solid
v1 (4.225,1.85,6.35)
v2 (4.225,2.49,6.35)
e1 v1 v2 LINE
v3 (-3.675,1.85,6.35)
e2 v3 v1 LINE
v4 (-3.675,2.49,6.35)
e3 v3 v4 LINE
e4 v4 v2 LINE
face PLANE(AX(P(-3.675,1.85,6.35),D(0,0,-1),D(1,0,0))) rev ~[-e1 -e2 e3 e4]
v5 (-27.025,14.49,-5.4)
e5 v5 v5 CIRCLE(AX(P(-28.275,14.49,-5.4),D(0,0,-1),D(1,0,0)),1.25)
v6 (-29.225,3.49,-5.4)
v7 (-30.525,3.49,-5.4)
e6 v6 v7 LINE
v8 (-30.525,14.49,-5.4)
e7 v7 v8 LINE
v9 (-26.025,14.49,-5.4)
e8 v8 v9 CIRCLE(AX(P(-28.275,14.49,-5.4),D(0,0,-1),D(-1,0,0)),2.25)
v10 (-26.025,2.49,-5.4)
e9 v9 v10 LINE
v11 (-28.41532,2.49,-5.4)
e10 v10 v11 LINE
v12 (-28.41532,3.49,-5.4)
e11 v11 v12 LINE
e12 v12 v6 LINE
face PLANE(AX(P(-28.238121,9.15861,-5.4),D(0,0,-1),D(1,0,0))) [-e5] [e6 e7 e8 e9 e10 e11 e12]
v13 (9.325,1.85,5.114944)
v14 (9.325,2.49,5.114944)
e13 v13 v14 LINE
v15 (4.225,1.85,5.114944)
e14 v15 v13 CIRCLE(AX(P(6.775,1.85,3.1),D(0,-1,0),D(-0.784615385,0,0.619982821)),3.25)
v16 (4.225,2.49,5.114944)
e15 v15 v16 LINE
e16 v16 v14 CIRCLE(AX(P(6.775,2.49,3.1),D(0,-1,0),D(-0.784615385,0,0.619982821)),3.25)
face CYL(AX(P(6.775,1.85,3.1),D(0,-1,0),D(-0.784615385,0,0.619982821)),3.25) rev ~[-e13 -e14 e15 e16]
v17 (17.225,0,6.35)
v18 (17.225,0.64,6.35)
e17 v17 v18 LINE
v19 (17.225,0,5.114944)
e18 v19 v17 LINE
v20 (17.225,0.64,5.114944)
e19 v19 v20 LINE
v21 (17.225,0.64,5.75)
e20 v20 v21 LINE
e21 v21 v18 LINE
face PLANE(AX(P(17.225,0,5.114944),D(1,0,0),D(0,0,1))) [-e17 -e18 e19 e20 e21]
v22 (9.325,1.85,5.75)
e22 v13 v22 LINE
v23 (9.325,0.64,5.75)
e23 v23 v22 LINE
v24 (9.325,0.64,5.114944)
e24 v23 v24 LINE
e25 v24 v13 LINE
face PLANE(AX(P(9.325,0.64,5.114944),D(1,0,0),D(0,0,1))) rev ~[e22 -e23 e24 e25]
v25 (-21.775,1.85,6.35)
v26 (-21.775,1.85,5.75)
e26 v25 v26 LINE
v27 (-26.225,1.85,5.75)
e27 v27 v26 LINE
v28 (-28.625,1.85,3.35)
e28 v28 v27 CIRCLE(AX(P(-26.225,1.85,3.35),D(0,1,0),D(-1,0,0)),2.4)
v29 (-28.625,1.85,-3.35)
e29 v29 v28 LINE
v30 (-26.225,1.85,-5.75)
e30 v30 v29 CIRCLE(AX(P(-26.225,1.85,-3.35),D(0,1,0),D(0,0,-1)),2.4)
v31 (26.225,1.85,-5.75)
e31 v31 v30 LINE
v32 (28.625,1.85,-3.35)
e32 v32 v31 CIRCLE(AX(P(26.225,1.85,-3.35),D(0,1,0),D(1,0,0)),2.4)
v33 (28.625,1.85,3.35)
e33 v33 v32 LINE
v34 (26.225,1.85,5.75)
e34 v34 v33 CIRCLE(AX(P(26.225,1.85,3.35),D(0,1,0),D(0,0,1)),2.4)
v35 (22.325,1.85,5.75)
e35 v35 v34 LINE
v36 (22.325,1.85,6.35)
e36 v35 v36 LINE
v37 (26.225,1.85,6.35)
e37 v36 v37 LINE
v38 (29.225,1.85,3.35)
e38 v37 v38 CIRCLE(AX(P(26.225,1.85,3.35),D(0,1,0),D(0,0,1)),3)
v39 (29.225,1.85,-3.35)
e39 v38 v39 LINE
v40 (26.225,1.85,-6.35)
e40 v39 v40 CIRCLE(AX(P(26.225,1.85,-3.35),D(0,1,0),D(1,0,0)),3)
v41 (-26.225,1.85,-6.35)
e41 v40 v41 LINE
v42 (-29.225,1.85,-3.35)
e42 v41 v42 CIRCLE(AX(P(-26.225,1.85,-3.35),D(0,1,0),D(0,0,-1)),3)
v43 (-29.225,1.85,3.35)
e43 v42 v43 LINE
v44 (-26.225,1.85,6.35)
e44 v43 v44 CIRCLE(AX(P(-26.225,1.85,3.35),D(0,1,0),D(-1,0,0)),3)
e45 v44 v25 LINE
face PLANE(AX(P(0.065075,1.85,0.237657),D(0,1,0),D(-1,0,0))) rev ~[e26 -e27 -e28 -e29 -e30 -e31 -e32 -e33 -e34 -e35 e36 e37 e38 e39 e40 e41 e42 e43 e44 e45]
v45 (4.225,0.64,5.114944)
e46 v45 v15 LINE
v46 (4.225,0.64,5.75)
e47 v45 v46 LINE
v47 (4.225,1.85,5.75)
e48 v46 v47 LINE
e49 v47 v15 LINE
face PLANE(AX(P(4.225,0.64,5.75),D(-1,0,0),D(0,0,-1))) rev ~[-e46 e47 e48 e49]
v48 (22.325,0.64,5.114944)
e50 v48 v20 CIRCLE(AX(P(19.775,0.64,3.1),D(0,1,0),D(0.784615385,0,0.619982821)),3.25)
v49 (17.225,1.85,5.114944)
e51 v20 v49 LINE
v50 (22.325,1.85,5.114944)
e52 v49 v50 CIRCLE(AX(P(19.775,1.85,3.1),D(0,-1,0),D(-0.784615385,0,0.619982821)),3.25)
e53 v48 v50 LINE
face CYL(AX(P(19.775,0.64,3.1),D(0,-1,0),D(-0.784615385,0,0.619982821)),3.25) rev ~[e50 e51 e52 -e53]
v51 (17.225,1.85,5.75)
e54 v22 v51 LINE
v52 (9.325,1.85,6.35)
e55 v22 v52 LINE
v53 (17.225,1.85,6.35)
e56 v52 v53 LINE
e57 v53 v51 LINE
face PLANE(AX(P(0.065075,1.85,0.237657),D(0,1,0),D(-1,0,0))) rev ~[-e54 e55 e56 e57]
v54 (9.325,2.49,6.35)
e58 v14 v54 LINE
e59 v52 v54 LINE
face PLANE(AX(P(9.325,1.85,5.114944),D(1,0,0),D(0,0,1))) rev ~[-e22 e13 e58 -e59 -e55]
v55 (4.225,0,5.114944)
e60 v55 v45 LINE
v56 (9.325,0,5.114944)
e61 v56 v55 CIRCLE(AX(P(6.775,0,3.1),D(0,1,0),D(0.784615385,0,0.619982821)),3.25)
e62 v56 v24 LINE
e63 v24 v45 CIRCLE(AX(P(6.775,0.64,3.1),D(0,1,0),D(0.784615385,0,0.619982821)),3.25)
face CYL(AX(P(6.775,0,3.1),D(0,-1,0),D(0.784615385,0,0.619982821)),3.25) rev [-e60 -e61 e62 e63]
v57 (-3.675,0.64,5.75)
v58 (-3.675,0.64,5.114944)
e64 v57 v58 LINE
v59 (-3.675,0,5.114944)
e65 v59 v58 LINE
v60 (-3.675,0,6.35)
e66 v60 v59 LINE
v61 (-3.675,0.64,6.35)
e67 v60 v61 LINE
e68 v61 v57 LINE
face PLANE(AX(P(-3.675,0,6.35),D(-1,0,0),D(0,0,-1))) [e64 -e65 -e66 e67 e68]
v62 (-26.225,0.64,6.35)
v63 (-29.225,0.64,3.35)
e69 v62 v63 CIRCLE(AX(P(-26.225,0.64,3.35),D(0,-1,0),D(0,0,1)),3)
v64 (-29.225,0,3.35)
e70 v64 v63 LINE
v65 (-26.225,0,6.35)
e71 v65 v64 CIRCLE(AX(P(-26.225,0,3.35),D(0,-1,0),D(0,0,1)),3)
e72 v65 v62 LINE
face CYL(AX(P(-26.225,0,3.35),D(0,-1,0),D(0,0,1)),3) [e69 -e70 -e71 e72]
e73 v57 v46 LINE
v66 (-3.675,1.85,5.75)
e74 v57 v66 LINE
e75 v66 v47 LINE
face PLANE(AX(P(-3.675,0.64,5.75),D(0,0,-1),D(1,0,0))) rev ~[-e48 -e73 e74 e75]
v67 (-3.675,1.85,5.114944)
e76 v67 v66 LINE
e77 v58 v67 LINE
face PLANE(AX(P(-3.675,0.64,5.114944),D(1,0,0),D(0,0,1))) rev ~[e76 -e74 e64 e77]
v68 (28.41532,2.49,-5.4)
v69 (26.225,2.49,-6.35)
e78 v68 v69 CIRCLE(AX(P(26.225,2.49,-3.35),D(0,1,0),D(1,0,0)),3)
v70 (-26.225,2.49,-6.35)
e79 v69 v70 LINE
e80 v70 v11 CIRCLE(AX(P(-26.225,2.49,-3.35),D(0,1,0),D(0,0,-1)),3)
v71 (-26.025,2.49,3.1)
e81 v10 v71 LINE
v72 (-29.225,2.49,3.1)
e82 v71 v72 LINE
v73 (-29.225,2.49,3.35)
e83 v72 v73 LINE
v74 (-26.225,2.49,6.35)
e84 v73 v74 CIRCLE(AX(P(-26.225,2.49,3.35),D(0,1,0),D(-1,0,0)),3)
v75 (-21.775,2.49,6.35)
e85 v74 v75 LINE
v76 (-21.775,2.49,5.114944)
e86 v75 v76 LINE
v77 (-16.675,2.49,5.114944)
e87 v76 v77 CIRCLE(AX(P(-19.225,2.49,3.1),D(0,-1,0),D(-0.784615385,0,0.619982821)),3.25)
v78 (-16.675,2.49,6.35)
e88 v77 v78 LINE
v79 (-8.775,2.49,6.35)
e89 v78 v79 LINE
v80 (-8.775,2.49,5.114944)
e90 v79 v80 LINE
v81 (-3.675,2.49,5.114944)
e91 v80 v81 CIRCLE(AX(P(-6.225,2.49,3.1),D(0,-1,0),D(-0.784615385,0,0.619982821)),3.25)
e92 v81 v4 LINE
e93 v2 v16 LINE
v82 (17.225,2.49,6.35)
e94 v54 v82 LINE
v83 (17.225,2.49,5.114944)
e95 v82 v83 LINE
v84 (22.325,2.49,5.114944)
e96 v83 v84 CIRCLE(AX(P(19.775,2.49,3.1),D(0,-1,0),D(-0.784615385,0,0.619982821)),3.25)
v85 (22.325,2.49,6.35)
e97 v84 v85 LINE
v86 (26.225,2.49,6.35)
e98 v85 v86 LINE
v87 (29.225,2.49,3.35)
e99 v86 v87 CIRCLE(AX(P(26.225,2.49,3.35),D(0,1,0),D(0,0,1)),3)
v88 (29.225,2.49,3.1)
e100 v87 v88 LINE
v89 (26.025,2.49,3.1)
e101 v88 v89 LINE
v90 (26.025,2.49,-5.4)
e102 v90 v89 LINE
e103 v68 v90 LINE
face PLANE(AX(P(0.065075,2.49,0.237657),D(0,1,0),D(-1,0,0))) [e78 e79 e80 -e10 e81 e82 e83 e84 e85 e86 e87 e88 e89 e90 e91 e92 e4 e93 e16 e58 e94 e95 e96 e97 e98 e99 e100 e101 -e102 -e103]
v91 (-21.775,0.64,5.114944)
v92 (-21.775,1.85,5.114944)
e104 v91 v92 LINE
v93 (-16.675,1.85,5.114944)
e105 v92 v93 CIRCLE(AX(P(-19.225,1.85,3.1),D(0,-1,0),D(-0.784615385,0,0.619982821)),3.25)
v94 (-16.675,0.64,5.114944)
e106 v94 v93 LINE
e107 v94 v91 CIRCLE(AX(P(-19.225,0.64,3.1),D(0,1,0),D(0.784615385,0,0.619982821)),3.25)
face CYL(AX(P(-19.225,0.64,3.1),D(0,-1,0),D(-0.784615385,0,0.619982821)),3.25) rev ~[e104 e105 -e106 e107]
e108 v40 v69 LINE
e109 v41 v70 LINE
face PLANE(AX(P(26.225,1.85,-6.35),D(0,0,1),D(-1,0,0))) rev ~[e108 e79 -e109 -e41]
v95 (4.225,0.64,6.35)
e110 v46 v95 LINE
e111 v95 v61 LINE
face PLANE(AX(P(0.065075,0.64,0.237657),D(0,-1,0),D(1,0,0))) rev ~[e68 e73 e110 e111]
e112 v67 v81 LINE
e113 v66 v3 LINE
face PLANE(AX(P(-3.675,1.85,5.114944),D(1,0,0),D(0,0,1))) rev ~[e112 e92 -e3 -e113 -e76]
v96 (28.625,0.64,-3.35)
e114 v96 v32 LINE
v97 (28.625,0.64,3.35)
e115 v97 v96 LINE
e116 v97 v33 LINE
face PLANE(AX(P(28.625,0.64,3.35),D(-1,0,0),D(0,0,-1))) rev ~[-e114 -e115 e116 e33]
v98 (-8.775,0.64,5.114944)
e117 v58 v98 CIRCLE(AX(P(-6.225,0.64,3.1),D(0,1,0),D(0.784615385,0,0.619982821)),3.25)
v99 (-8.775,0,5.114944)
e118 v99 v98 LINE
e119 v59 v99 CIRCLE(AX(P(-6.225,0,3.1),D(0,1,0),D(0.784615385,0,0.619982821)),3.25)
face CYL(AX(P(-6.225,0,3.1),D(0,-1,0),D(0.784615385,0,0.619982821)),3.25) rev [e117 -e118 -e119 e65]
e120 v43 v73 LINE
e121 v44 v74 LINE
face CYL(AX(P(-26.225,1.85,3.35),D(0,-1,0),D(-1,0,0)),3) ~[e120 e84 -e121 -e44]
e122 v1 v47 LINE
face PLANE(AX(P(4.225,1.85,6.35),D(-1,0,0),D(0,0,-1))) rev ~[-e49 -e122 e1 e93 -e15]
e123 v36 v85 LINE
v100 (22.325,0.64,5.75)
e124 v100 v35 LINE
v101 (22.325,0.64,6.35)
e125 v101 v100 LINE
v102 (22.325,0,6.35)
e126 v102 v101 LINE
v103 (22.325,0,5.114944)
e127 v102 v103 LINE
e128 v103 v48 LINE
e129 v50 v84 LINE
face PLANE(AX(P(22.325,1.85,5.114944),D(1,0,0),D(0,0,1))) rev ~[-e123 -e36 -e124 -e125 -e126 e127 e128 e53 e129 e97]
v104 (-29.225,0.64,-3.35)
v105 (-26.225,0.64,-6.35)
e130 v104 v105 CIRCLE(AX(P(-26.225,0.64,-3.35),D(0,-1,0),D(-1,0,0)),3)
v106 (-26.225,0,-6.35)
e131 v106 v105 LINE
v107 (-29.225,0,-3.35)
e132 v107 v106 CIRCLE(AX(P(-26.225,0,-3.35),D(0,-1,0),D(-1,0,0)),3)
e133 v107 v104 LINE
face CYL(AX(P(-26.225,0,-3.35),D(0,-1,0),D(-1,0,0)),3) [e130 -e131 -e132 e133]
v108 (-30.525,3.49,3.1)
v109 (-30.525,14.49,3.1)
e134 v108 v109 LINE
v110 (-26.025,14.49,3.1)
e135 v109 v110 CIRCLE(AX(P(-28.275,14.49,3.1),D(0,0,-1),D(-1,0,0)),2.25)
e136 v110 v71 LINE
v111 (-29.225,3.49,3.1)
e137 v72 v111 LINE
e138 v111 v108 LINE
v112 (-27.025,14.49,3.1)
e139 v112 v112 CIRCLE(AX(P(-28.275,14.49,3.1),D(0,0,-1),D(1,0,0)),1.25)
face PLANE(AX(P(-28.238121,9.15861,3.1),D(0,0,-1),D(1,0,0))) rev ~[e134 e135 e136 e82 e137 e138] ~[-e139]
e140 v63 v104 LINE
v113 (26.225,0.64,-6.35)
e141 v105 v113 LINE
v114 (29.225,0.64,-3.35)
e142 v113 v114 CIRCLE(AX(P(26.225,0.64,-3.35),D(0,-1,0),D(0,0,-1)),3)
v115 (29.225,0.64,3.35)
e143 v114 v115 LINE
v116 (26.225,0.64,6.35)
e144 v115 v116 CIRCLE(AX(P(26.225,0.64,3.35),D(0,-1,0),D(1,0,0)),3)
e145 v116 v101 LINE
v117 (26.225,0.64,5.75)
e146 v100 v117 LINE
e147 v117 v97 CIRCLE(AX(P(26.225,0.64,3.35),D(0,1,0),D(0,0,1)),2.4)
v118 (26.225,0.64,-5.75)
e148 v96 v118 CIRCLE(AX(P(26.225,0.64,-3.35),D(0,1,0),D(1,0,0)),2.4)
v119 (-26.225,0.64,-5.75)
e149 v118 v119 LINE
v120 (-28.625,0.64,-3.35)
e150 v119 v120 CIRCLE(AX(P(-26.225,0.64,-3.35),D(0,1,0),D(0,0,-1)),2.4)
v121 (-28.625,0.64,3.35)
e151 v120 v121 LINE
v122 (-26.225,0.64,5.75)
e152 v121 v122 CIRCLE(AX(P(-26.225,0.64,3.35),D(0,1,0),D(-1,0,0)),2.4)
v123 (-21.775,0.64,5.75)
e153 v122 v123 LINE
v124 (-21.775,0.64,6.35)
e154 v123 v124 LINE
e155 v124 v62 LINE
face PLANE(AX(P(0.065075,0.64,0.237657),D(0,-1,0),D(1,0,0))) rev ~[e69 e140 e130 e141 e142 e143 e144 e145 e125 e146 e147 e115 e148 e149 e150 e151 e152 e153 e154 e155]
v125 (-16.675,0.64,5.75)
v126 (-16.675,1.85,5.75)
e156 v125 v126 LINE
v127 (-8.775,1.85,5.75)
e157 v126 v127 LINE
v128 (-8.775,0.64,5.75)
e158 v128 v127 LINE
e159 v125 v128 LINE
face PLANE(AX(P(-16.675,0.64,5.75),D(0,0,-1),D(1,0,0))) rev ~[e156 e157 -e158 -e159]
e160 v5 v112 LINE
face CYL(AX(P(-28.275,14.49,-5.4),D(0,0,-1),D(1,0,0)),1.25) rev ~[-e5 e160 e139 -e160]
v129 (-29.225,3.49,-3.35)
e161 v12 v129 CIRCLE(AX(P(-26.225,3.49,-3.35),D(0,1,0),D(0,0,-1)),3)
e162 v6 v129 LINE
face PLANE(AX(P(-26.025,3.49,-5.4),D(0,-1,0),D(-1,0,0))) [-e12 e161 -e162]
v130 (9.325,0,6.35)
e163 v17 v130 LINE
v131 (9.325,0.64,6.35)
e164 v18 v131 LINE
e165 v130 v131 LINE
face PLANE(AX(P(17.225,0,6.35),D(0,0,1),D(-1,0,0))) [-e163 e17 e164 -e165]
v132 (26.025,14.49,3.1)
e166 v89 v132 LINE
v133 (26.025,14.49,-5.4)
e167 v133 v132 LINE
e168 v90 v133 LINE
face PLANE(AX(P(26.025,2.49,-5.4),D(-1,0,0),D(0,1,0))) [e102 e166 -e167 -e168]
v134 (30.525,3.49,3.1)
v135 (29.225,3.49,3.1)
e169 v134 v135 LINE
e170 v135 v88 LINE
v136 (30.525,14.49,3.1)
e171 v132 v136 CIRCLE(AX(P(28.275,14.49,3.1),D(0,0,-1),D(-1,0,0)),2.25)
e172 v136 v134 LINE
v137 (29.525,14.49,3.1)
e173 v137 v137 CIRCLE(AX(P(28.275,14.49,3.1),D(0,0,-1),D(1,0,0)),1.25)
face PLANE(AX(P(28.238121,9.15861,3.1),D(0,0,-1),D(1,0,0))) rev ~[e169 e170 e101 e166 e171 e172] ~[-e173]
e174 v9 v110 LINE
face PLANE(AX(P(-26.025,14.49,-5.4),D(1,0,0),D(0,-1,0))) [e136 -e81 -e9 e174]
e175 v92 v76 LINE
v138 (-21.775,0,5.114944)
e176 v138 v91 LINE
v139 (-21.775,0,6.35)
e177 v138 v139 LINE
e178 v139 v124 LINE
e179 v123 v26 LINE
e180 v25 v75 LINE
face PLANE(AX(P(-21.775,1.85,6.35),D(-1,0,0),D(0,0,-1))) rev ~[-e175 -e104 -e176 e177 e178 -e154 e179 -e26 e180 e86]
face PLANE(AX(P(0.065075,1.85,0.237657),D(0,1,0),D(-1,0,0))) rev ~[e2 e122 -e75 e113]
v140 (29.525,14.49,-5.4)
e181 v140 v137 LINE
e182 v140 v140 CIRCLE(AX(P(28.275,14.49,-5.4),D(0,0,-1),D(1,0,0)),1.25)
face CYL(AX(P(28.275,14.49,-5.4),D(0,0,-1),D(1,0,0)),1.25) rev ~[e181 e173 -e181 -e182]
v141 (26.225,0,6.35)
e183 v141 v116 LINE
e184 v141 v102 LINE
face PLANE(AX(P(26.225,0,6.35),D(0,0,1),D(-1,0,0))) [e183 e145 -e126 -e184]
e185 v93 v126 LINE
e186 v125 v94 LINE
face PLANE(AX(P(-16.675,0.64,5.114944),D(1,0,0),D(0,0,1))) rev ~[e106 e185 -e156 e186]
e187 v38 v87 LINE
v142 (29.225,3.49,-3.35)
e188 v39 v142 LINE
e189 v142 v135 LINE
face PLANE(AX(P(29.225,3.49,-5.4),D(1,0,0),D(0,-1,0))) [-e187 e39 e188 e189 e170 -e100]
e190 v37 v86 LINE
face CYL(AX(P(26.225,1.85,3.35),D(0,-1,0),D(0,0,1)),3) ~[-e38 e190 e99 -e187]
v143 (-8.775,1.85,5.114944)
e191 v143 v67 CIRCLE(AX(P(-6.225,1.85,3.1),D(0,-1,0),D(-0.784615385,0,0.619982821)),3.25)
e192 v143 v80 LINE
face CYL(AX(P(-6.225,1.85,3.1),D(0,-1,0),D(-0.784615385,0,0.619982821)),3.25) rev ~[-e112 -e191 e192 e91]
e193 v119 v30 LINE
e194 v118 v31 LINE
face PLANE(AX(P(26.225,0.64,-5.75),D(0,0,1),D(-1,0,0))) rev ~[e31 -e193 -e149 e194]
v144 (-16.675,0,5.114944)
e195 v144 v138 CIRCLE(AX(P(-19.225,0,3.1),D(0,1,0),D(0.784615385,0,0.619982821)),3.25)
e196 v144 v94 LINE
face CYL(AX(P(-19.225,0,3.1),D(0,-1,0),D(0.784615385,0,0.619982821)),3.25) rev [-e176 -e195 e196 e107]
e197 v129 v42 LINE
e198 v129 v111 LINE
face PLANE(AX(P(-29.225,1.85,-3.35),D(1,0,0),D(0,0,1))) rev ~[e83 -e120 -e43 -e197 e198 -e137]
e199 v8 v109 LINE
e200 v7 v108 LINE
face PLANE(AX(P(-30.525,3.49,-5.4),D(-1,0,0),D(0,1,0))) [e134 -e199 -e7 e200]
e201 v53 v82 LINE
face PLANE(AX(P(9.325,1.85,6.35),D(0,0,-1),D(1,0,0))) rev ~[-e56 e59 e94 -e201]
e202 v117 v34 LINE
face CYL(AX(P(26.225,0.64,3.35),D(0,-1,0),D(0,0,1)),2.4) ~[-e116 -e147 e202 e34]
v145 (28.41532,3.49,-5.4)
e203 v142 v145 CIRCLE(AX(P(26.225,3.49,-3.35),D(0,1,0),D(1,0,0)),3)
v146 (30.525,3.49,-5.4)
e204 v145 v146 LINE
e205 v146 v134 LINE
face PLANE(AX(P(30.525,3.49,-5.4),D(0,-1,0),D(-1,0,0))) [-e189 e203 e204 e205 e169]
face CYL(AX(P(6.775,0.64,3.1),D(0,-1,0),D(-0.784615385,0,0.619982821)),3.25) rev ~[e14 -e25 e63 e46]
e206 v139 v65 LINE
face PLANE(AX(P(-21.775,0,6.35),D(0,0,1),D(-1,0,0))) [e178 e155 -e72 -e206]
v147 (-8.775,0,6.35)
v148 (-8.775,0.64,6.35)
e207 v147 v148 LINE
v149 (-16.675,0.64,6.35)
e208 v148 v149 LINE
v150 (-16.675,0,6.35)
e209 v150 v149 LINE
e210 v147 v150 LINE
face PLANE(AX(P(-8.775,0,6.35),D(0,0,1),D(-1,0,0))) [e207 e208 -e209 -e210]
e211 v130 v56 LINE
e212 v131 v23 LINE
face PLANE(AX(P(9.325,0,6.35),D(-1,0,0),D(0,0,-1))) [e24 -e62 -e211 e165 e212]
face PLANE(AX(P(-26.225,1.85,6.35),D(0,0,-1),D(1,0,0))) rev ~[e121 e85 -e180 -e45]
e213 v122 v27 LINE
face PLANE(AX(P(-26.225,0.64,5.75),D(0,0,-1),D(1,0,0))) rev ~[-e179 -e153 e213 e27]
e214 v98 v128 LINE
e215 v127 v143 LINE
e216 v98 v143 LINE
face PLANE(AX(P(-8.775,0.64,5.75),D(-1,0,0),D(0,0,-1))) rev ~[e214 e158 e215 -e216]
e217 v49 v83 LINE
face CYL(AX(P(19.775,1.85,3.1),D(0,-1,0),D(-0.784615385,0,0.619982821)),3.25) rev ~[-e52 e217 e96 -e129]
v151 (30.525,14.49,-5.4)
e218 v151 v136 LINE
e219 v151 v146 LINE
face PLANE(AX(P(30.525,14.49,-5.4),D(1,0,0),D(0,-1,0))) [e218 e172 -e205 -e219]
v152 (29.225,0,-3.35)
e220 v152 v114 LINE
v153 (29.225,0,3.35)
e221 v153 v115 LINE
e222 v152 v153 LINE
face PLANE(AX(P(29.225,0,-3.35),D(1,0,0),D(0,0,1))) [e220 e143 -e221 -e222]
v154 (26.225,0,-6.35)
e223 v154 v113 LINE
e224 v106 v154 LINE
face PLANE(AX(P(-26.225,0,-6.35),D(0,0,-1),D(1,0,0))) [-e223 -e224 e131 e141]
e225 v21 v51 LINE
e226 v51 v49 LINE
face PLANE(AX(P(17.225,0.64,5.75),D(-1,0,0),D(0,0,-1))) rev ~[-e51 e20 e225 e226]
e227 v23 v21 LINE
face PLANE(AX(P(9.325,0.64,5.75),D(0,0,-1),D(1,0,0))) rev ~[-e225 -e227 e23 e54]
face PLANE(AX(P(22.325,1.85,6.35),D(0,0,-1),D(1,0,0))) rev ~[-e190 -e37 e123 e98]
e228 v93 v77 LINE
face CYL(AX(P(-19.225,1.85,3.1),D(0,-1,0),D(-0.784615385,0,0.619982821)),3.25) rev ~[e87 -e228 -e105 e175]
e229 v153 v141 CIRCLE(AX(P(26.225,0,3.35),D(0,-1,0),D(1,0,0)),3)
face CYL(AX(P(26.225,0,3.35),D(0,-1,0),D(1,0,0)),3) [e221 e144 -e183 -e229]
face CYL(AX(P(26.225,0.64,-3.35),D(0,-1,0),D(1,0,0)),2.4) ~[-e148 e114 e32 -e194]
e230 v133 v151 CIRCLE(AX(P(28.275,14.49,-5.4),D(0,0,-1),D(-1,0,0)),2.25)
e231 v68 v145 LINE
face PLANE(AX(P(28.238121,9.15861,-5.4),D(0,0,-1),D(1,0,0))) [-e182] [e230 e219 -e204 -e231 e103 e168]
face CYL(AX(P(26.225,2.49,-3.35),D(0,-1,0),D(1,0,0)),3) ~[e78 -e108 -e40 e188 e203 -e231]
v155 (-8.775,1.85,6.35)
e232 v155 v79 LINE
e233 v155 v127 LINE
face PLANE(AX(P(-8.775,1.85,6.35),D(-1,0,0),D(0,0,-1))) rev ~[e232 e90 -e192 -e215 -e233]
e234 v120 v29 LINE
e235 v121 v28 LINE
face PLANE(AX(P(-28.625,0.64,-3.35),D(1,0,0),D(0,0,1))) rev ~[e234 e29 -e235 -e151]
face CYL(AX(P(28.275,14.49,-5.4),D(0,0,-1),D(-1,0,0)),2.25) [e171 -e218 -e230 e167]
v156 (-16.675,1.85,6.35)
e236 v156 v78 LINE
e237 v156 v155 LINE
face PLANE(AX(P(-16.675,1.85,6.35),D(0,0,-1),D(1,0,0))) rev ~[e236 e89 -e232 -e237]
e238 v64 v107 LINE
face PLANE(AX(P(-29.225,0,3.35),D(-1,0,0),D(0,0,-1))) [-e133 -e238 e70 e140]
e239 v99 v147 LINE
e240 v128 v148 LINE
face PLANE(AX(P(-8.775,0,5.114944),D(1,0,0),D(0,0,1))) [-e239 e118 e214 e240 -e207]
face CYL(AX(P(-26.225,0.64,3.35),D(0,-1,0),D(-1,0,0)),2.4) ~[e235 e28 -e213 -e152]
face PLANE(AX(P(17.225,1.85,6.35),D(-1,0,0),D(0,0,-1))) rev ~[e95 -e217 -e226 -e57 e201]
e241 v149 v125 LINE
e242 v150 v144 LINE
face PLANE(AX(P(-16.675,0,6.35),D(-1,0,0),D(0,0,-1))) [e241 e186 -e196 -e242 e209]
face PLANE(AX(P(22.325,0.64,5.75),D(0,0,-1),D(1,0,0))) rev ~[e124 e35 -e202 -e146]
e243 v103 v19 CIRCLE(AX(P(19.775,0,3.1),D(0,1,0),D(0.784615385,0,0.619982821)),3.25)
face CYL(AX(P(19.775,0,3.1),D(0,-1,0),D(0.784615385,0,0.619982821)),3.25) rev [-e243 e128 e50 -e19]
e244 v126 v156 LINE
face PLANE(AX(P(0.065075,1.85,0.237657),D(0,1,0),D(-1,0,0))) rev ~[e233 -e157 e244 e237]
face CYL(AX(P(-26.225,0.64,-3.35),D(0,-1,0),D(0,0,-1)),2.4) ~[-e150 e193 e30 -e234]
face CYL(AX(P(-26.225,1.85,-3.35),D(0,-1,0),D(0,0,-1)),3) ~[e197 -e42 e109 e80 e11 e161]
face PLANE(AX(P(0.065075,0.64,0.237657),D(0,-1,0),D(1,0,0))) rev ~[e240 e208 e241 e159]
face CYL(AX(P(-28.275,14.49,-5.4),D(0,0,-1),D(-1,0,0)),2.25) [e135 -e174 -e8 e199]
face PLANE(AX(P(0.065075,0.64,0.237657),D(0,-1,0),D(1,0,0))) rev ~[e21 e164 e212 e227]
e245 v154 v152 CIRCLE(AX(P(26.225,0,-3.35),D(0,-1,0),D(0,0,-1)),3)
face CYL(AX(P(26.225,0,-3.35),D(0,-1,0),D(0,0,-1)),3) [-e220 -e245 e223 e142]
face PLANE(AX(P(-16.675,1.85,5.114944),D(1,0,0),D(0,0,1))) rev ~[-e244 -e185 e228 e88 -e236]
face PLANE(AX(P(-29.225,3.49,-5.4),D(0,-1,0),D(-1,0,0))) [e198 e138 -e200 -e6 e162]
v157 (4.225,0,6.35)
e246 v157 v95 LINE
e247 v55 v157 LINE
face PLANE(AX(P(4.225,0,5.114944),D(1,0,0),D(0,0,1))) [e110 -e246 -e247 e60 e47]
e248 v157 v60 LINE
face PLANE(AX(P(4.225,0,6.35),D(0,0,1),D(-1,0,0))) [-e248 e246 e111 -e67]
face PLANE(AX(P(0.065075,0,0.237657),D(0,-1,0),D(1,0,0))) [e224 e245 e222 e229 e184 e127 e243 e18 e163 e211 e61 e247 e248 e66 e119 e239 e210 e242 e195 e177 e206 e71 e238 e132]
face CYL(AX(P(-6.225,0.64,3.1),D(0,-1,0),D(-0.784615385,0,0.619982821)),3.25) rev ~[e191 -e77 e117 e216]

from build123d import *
from build123d import SkipClean  # not in build123d's __all__

# Parameters (mm, degrees)
F1_DEPTH = 0.64
F3_DEPTH = 1.21
F5_DEPTH = 0.64
F7_R     = 1.25
F8_DEPTH = 8.5
F9_DEPTH = 1


# Not quite as in the source:
# - after a boolean that leaves OpenCascade's solid faulty, fix() repairs it


with BuildPart() as f1:
    # F0 (on Front) → F1 (new body)
    with BuildSketch(Plane.XZ):
        with BuildLine():
            ThreePointArc((-29.225, -3.35), (-28.3463203436, -5.4713203436), (-26.225, -6.35))
            Line((-26.225, -6.35), (26.225, -6.35))
            ThreePointArc((26.225, -6.35), (28.3463203436, -5.4713203436), (29.225, -3.35))
            Line((29.225, -3.35), (29.225, 3.35))
            ThreePointArc((29.225, 3.35), (28.3463203436, 5.4713203436), (26.225, 6.35))
            Line((26.225, 6.35), (22.325, 6.35))
            Line((22.325, 6.35), (22.325, 5.114944168))
            ThreePointArc((22.325, 5.114944168), (19.775, -0.15), (17.225, 5.114944168))
            Line((17.225, 5.114944168), (17.225, 6.35))
            Line((17.225, 6.35), (9.325, 6.35))
            Line((9.325, 6.35), (9.325, 5.114944168))
            ThreePointArc((9.325, 5.114944168), (6.775, -0.15), (4.225, 5.114944168))
            Line((4.225, 5.114944168), (4.225, 6.35))
            Line((4.225, 6.35), (-3.675, 6.35))
            Line((-3.675, 6.35), (-3.675, 5.114944168))
            ThreePointArc((-3.675, 5.114944168), (-6.225, -0.15), (-8.775, 5.114944168))
            Line((-8.775, 5.114944168), (-8.775, 6.35))
            Line((-8.775, 6.35), (-16.675, 6.35))
            Line((-16.675, 6.35), (-16.675, 5.114944168))
            ThreePointArc((-16.675, 5.114944168), (-19.225, -0.15), (-21.775, 5.114944168))
            Line((-21.775, 5.114944168), (-21.775, 6.35))
            Line((-21.775, 6.35), (-26.225, 6.35))
            ThreePointArc((-26.225, 6.35), (-28.3463203436, 5.4713203436), (-29.225, 3.35))
            Line((-29.225, 3.35), (-29.225, -3.35))
        make_face()
    extrude(amount=-F1_DEPTH)

    # F2 (on face) → F3 (join)
    with BuildSketch(Plane(origin=(0, 0.64, 0), x_dir=(-1, 0, 0), z_dir=(0, 1, 0))):
        with BuildLine():
            Line((-22.325, 5.114944168), (-22.325, 5.75))
            Line((-22.325, 5.75), (-26.225, 5.75))
            ThreePointArc((-26.225, 5.75), (-27.9220562748, 5.0470562748), (-28.625, 3.35))
            Line((-28.625, 3.35), (-28.625, -3.35))
            ThreePointArc((-28.625, -3.35), (-27.9220562748, -5.0470562748), (-26.225, -5.75))
            Line((-26.225, -5.75), (26.225, -5.75))
            ThreePointArc((26.225, -5.75), (27.9220562748, -5.0470562748), (28.625, -3.35))
            Line((28.625, -3.35), (28.625, 3.35))
            ThreePointArc((28.625, 3.35), (27.9220562748, 5.0470562748), (26.225, 5.75))
            Line((26.225, 5.75), (21.775, 5.75))
            Line((21.775, 5.75), (21.775, 5.114944168))
            ThreePointArc((21.775, 5.114944168), (19.225, -0.15), (16.675, 5.114944168))
            Line((16.675, 5.114944168), (16.675, 5.75))
            Line((16.675, 5.75), (8.775, 5.75))
            Line((8.775, 5.75), (8.775, 5.114944168))
            ThreePointArc((8.775, 5.114944168), (6.225, -0.15), (3.675, 5.114944168))
            Line((3.675, 5.114944168), (3.675, 5.75))
            Line((3.675, 5.75), (-4.225, 5.75))
            Line((-4.225, 5.75), (-4.225, 5.114944168))
            ThreePointArc((-4.225, 5.114944168), (-6.775, -0.15), (-9.325, 5.114944168))
            Line((-9.325, 5.114944168), (-9.325, 5.75))
            Line((-9.325, 5.75), (-17.225, 5.75))
            Line((-17.225, 5.75), (-17.225, 5.114944168))
            ThreePointArc((-17.225, 5.114944168), (-19.775, -0.15), (-22.325, 5.114944168))
        make_face()
    with SkipClean():  # cleaning this boolean's faces spoils the solid; the shape is the same uncleaned
        extrude(amount=F3_DEPTH)

    # F4 (on face) → F5 (join)
    with BuildSketch(Plane(origin=(0, 1.85, 0), x_dir=(-1, 0, 0), z_dir=(0, 1, 0))):
        with BuildLine():
            ThreePointArc((-29.225, -3.35), (-28.3463203436, -5.4713203436), (-26.225, -6.35))
            Line((-26.225, -6.35), (26.225, -6.35))
            ThreePointArc((26.225, -6.35), (28.3463203436, -5.4713203436), (29.225, -3.35))
            Line((29.225, -3.35), (29.225, 3.35))
            ThreePointArc((29.225, 3.35), (28.3463203436, 5.4713203436), (26.225, 6.35))
            Line((26.225, 6.35), (21.775, 6.35))
            Line((21.775, 6.35), (21.775, 5.114944168))
            ThreePointArc((21.775, 5.114944168), (19.225, -0.15), (16.675, 5.114944168))
            Line((16.675, 5.114944168), (16.675, 6.35))
            Line((16.675, 6.35), (8.775, 6.35))
            Line((8.775, 6.35), (8.775, 5.114944168))
            ThreePointArc((8.775, 5.114944168), (6.225, -0.15), (3.675, 5.114944168))
            Line((3.675, 5.114944168), (3.675, 6.35))
            Line((3.675, 6.35), (-4.225, 6.35))
            Line((-4.225, 6.35), (-4.225, 5.114944168))
            ThreePointArc((-4.225, 5.114944168), (-6.775, -0.15), (-9.325, 5.114944168))
            Line((-9.325, 5.114944168), (-9.325, 6.35))
            Line((-9.325, 6.35), (-17.225, 6.35))
            Line((-17.225, 6.35), (-17.225, 5.114944168))
            ThreePointArc((-17.225, 5.114944168), (-19.775, -0.15), (-22.325, 5.114944168))
            Line((-22.325, 5.114944168), (-22.325, 6.35))
            Line((-22.325, 6.35), (-26.225, 6.35))
            ThreePointArc((-26.225, 6.35), (-28.3463203436, 5.4713203436), (-29.225, 3.35))
            Line((-29.225, 3.35), (-29.225, -3.35))
        make_face()
    extrude(amount=F5_DEPTH)

    add(f1.part.fix(), mode=Mode.REPLACE)

    # F7 (on offset) → F8 (join)
    with BuildSketch(Plane(origin=(0, 0, -5.4), x_dir=(1, 0, 0), z_dir=(0, 0, -1))):
        with BuildLine():
            Line((29.225, -3.49), (29.225, -2.49))
            Line((29.225, -2.49), (26.025, -2.49))
            Line((26.025, -2.49), (26.025, -3.49))
            Line((26.025, -3.49), (26.025, -14.49))
            ThreePointArc((26.025, -14.49), (28.275, -16.74), (30.525, -14.49))
            Line((30.525, -14.49), (30.525, -3.49))
            Line((30.525, -3.49), (29.225, -3.49))
        make_face()
        with Locations((28.275, -14.49)):
            Circle(F7_R, mode=Mode.SUBTRACT)
        with BuildLine():
            Line((-26.025, -14.49), (-26.025, -3.49))
            Line((-26.025, -3.49), (-26.025, -2.49))
            Line((-26.025, -2.49), (-29.225, -2.49))
            Line((-29.225, -2.49), (-29.225, -3.49))
            Line((-29.225, -3.49), (-30.525, -3.49))
            Line((-30.525, -3.49), (-30.525, -14.49))
            ThreePointArc((-30.525, -14.49), (-28.275, -16.74), (-26.025, -14.49))
        make_face()
        with Locations((-28.275, -14.49)):
            Circle(F7_R, mode=Mode.SUBTRACT)
    extrude(amount=-F8_DEPTH)

    # F9 (cut): faces of the model
    f9_faces = [f1.faces().sort_by_distance(p)[0] for p in [
        (28.9889729085, 2.49, -4.9023634763),
        (-28.9889729085, 2.49, -4.9023634763),
    ]]
    extrude(f9_faces, amount=-F9_DEPTH, mode=Mode.SUBTRACT)


solid = f1.part
